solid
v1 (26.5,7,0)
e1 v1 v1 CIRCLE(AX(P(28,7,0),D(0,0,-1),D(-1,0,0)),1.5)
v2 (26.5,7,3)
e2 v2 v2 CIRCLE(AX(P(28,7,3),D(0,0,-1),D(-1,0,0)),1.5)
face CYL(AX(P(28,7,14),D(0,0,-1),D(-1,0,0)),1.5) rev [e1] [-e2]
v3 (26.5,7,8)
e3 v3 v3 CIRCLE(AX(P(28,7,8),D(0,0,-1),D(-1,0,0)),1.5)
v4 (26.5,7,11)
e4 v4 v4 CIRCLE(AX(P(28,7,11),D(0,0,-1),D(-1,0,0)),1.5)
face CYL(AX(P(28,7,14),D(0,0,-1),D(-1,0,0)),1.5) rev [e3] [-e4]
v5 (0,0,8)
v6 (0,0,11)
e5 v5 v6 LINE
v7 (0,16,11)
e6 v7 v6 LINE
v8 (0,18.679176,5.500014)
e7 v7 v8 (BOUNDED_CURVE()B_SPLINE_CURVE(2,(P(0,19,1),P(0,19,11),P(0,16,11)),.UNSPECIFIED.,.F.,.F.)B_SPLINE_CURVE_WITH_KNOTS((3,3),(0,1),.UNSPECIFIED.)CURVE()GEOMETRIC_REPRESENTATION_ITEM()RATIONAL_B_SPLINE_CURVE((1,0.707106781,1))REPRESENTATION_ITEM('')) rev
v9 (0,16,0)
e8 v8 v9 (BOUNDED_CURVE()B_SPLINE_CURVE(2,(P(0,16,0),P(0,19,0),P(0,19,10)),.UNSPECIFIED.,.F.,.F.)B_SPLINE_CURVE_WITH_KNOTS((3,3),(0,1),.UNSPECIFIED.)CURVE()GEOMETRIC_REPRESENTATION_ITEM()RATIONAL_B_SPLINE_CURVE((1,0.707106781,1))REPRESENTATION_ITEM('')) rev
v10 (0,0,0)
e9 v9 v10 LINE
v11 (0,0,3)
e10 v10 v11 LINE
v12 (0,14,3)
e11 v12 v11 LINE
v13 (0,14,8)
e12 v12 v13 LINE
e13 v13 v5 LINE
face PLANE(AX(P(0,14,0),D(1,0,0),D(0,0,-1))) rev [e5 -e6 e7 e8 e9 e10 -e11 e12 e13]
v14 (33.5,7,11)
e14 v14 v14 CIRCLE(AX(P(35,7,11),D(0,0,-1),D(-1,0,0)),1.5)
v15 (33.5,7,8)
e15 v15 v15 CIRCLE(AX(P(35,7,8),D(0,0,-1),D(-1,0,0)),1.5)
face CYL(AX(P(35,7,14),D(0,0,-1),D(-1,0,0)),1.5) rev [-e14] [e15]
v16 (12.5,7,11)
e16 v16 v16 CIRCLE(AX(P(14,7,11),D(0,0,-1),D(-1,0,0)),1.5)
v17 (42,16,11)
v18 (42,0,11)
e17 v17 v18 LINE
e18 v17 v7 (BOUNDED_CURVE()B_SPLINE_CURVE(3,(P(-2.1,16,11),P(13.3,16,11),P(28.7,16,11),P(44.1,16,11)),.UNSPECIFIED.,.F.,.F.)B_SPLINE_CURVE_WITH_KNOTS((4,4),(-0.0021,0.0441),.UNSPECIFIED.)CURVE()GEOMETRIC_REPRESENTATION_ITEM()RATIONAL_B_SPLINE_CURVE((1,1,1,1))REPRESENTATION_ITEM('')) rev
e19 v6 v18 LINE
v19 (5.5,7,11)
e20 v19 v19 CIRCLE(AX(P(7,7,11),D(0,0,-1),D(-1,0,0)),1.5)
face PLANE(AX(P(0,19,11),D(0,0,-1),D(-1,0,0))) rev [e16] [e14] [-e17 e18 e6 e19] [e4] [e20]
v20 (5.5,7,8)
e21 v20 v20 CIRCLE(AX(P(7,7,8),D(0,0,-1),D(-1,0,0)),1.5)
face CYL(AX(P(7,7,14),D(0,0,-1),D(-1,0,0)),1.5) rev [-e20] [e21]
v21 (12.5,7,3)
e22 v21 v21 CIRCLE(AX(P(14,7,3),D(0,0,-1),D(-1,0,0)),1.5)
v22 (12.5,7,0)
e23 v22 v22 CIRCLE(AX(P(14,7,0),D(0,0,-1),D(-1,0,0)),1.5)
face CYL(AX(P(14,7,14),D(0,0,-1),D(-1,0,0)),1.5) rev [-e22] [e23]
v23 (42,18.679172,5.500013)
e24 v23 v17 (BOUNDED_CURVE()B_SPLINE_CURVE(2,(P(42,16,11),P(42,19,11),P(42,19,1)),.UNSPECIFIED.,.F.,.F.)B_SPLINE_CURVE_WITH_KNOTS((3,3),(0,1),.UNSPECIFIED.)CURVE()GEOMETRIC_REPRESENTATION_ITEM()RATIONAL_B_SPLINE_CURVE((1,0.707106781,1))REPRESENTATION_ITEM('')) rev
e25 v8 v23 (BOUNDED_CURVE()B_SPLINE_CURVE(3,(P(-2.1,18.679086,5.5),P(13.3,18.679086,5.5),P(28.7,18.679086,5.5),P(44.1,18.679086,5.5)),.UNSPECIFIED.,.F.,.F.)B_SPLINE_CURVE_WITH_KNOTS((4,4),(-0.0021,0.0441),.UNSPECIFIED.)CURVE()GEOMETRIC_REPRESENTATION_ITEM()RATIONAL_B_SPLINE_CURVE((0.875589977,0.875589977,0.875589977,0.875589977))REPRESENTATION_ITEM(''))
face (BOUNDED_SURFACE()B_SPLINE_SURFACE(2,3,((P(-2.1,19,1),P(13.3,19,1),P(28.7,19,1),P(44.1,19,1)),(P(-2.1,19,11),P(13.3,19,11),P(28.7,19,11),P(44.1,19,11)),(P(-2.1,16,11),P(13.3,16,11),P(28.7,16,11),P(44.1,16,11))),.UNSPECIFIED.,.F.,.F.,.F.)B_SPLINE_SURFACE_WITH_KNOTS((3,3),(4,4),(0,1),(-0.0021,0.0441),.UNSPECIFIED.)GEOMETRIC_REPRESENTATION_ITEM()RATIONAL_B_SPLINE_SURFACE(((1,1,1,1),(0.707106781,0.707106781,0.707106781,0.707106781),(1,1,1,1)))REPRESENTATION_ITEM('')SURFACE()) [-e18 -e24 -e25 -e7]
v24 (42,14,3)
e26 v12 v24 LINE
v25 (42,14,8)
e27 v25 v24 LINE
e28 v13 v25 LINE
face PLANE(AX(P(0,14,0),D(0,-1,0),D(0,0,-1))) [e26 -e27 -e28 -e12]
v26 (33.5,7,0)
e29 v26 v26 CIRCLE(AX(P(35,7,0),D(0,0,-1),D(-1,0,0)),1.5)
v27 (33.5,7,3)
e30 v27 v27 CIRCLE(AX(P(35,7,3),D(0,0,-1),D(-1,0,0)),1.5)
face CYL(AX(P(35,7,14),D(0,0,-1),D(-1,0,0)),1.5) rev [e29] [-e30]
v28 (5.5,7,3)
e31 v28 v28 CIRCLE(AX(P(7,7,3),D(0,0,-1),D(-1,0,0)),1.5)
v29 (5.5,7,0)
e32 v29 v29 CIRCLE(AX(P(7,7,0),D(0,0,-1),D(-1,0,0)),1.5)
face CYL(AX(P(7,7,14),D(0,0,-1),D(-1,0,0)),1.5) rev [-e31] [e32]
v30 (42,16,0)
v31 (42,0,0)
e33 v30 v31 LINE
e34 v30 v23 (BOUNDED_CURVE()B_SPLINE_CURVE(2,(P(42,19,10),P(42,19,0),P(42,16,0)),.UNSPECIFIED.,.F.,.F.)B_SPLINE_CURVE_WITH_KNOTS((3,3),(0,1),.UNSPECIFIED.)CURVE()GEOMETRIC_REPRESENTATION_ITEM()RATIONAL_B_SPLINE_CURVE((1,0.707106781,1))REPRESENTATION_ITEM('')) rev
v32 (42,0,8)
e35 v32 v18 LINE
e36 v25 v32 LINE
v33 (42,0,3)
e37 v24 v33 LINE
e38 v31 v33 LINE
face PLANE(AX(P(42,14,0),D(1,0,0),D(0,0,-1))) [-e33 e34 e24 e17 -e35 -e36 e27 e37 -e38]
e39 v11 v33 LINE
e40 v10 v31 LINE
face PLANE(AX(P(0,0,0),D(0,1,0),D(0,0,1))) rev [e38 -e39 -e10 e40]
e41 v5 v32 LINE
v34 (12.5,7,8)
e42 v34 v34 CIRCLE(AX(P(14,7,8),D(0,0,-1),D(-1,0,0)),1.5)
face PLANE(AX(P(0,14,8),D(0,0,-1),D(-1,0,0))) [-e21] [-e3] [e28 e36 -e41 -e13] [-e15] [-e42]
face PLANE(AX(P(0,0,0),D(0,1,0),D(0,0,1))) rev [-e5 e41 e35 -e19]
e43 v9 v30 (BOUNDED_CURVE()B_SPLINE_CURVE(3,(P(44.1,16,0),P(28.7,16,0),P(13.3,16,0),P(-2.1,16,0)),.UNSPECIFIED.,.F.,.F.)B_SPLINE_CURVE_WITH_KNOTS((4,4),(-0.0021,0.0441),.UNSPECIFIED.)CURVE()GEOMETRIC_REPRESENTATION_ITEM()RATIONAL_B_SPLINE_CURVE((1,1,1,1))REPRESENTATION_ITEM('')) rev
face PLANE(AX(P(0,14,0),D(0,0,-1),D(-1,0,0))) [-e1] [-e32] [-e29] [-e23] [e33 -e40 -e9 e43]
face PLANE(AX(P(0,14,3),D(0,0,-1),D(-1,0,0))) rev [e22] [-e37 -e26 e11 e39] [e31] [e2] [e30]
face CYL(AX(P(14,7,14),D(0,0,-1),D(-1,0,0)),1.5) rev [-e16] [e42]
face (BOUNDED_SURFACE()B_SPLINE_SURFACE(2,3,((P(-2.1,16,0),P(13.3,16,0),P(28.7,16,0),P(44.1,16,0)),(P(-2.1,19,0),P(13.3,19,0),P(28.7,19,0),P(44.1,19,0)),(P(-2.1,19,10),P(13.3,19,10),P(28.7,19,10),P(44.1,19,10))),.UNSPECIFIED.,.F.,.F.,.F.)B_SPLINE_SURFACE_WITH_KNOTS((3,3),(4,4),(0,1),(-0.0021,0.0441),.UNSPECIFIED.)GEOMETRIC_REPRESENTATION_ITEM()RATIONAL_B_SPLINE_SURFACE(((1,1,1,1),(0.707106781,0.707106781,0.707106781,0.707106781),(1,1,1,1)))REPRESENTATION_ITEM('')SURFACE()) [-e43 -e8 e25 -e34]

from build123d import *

# Parameters (mm, degrees)
SKETCH1_W             = 42
SKETCH1_H             = 3
BOSS_EXTRUDE1_DEPTH   = 14
BOSS_EXTRUDE1_2_DEPTH = 14
SKETCH2_R             = 1.5
CUT_EXTRUDE1_DEPTH    = 14
SKETCH3_W             = 42
SKETCH3_H             = 11
BOSS_EXTRUDE2_DEPTH   = 5
FILLET1_SIZE          = 3
FILLET1_SIZE_2        = 10


with BuildPart() as part:
    # Sketch1 → Boss-Extrude1 (new body)
    with BuildSketch(Plane(origin=(0, 0, 0), x_dir=(1, 0, 0), z_dir=(0, 1, 0))):
        with Locations((21, -1.5)):
            Rectangle(SKETCH1_W, SKETCH1_H)
    extrude(amount=BOSS_EXTRUDE1_DEPTH)


with BuildPart() as body_2:
    # Sketch1 → Boss-Extrude1 2 (new body)
    with BuildSketch(Plane(origin=(0, 0, 0), x_dir=(1, 0, 0), z_dir=(0, 1, 0))):
        with Locations((21, -9.5)):
            Rectangle(SKETCH1_W, SKETCH1_H)
    extrude(amount=BOSS_EXTRUDE1_2_DEPTH)


with BuildPart() as cut_extrude1_tool:
    # Sketch2 → Cut-Extrude1 (new body)
    with BuildSketch(Plane(origin=(0, 0, 0), x_dir=(-1, 0, 0), z_dir=(0, 0, -1))):
        with BuildLine():
            Line((-36.5, 7), (-35, 7))
            Line((-35, 7), (-33.5, 7))
            ThreePointArc((-33.5, 7), (-35, 8.5), (-36.5, 7))
        make_face()
        with BuildLine():
            Line((-33.5, 7), (-35, 7))
            Line((-35, 7), (-36.5, 7))
            ThreePointArc((-36.5, 7), (-35, 5.5), (-33.5, 7))
        make_face()
        with BuildLine():
            ThreePointArc((-26.5, 7), (-28, 8.5), (-29.5, 7))
            Line((-29.5, 7), (-28, 7))
            Line((-28, 7), (-26.5, 7))
        make_face()
        with BuildLine():
            Line((-28, 7), (-29.5, 7))
            ThreePointArc((-29.5, 7), (-28, 5.5), (-26.5, 7))
            Line((-26.5, 7), (-28, 7))
        make_face()
        with BuildLine():
            ThreePointArc((-5.5, 7), (-7, 8.5), (-8.5, 7))
            Line((-8.5, 7), (-7, 7))
            Line((-7, 7), (-5.5, 7))
        make_face()
        with BuildLine():
            Line((-7, 7), (-8.5, 7))
            ThreePointArc((-8.5, 7), (-7, 5.5), (-5.5, 7))
            Line((-5.5, 7), (-7, 7))
        make_face()
        with Locations((-14, 7)):
            Circle(SKETCH2_R)
    extrude(amount=-CUT_EXTRUDE1_DEPTH)


with BuildPart() as part_1:
    add(part.part)

    # Cut-Extrude1: cut by cut_extrude1_tool
    add(cut_extrude1_tool.part, mode=Mode.SUBTRACT)



with BuildPart() as body_2_1:
    add(body_2.part)

    # Cut-Extrude1: cut by cut_extrude1_tool
    add(cut_extrude1_tool.part, mode=Mode.SUBTRACT)


with BuildPart() as part_2:
    add(part_1.part)

    add(body_2_1.part)  # Boss-Extrude2 merges body 2
    # Sketch3 → Boss-Extrude2 (add)
    with BuildSketch(Plane(origin=(0, 14, 0), x_dir=(1, 0, 0), z_dir=(0, 1, 0))):
        with Locations((21, -5.5)):
            Rectangle(SKETCH3_W, SKETCH3_H)
    extrude(amount=BOSS_EXTRUDE2_DEPTH)

    # Fillet1
    # an asymmetric fillet: 10, 3 mm, written as the material it takes off along each edge
    with BuildSketch(Plane(origin=(67, 19, 0), x_dir=(0, -1, 0), z_dir=(-1, 0, 0))) as fillet1_piece_1:
        with BuildLine():
            Bezier((FILLET1_SIZE, 0), (0, 0), (0, FILLET1_SIZE_2), weights=[1, 0.707106781, 1])
            Line((0, FILLET1_SIZE_2), (0, 0))
            Line((0, 0), (FILLET1_SIZE, 0))
        make_face()
    extrude(amount=92, mode=Mode.SUBTRACT)
    with BuildSketch(Plane(origin=(-25, 19, 11), x_dir=(0, 0, -1), z_dir=(1, 0, 0))) as fillet1_piece_2:
        with BuildLine():
            Bezier((FILLET1_SIZE_2, 0), (0, 0), (0, -FILLET1_SIZE), weights=[1, 0.707106781, 1])
            Line((0, -FILLET1_SIZE), (0, 0))
            Line((0, 0), (FILLET1_SIZE_2, 0))
        make_face()
    extrude(amount=92, mode=Mode.SUBTRACT)


solid = part_2.part
